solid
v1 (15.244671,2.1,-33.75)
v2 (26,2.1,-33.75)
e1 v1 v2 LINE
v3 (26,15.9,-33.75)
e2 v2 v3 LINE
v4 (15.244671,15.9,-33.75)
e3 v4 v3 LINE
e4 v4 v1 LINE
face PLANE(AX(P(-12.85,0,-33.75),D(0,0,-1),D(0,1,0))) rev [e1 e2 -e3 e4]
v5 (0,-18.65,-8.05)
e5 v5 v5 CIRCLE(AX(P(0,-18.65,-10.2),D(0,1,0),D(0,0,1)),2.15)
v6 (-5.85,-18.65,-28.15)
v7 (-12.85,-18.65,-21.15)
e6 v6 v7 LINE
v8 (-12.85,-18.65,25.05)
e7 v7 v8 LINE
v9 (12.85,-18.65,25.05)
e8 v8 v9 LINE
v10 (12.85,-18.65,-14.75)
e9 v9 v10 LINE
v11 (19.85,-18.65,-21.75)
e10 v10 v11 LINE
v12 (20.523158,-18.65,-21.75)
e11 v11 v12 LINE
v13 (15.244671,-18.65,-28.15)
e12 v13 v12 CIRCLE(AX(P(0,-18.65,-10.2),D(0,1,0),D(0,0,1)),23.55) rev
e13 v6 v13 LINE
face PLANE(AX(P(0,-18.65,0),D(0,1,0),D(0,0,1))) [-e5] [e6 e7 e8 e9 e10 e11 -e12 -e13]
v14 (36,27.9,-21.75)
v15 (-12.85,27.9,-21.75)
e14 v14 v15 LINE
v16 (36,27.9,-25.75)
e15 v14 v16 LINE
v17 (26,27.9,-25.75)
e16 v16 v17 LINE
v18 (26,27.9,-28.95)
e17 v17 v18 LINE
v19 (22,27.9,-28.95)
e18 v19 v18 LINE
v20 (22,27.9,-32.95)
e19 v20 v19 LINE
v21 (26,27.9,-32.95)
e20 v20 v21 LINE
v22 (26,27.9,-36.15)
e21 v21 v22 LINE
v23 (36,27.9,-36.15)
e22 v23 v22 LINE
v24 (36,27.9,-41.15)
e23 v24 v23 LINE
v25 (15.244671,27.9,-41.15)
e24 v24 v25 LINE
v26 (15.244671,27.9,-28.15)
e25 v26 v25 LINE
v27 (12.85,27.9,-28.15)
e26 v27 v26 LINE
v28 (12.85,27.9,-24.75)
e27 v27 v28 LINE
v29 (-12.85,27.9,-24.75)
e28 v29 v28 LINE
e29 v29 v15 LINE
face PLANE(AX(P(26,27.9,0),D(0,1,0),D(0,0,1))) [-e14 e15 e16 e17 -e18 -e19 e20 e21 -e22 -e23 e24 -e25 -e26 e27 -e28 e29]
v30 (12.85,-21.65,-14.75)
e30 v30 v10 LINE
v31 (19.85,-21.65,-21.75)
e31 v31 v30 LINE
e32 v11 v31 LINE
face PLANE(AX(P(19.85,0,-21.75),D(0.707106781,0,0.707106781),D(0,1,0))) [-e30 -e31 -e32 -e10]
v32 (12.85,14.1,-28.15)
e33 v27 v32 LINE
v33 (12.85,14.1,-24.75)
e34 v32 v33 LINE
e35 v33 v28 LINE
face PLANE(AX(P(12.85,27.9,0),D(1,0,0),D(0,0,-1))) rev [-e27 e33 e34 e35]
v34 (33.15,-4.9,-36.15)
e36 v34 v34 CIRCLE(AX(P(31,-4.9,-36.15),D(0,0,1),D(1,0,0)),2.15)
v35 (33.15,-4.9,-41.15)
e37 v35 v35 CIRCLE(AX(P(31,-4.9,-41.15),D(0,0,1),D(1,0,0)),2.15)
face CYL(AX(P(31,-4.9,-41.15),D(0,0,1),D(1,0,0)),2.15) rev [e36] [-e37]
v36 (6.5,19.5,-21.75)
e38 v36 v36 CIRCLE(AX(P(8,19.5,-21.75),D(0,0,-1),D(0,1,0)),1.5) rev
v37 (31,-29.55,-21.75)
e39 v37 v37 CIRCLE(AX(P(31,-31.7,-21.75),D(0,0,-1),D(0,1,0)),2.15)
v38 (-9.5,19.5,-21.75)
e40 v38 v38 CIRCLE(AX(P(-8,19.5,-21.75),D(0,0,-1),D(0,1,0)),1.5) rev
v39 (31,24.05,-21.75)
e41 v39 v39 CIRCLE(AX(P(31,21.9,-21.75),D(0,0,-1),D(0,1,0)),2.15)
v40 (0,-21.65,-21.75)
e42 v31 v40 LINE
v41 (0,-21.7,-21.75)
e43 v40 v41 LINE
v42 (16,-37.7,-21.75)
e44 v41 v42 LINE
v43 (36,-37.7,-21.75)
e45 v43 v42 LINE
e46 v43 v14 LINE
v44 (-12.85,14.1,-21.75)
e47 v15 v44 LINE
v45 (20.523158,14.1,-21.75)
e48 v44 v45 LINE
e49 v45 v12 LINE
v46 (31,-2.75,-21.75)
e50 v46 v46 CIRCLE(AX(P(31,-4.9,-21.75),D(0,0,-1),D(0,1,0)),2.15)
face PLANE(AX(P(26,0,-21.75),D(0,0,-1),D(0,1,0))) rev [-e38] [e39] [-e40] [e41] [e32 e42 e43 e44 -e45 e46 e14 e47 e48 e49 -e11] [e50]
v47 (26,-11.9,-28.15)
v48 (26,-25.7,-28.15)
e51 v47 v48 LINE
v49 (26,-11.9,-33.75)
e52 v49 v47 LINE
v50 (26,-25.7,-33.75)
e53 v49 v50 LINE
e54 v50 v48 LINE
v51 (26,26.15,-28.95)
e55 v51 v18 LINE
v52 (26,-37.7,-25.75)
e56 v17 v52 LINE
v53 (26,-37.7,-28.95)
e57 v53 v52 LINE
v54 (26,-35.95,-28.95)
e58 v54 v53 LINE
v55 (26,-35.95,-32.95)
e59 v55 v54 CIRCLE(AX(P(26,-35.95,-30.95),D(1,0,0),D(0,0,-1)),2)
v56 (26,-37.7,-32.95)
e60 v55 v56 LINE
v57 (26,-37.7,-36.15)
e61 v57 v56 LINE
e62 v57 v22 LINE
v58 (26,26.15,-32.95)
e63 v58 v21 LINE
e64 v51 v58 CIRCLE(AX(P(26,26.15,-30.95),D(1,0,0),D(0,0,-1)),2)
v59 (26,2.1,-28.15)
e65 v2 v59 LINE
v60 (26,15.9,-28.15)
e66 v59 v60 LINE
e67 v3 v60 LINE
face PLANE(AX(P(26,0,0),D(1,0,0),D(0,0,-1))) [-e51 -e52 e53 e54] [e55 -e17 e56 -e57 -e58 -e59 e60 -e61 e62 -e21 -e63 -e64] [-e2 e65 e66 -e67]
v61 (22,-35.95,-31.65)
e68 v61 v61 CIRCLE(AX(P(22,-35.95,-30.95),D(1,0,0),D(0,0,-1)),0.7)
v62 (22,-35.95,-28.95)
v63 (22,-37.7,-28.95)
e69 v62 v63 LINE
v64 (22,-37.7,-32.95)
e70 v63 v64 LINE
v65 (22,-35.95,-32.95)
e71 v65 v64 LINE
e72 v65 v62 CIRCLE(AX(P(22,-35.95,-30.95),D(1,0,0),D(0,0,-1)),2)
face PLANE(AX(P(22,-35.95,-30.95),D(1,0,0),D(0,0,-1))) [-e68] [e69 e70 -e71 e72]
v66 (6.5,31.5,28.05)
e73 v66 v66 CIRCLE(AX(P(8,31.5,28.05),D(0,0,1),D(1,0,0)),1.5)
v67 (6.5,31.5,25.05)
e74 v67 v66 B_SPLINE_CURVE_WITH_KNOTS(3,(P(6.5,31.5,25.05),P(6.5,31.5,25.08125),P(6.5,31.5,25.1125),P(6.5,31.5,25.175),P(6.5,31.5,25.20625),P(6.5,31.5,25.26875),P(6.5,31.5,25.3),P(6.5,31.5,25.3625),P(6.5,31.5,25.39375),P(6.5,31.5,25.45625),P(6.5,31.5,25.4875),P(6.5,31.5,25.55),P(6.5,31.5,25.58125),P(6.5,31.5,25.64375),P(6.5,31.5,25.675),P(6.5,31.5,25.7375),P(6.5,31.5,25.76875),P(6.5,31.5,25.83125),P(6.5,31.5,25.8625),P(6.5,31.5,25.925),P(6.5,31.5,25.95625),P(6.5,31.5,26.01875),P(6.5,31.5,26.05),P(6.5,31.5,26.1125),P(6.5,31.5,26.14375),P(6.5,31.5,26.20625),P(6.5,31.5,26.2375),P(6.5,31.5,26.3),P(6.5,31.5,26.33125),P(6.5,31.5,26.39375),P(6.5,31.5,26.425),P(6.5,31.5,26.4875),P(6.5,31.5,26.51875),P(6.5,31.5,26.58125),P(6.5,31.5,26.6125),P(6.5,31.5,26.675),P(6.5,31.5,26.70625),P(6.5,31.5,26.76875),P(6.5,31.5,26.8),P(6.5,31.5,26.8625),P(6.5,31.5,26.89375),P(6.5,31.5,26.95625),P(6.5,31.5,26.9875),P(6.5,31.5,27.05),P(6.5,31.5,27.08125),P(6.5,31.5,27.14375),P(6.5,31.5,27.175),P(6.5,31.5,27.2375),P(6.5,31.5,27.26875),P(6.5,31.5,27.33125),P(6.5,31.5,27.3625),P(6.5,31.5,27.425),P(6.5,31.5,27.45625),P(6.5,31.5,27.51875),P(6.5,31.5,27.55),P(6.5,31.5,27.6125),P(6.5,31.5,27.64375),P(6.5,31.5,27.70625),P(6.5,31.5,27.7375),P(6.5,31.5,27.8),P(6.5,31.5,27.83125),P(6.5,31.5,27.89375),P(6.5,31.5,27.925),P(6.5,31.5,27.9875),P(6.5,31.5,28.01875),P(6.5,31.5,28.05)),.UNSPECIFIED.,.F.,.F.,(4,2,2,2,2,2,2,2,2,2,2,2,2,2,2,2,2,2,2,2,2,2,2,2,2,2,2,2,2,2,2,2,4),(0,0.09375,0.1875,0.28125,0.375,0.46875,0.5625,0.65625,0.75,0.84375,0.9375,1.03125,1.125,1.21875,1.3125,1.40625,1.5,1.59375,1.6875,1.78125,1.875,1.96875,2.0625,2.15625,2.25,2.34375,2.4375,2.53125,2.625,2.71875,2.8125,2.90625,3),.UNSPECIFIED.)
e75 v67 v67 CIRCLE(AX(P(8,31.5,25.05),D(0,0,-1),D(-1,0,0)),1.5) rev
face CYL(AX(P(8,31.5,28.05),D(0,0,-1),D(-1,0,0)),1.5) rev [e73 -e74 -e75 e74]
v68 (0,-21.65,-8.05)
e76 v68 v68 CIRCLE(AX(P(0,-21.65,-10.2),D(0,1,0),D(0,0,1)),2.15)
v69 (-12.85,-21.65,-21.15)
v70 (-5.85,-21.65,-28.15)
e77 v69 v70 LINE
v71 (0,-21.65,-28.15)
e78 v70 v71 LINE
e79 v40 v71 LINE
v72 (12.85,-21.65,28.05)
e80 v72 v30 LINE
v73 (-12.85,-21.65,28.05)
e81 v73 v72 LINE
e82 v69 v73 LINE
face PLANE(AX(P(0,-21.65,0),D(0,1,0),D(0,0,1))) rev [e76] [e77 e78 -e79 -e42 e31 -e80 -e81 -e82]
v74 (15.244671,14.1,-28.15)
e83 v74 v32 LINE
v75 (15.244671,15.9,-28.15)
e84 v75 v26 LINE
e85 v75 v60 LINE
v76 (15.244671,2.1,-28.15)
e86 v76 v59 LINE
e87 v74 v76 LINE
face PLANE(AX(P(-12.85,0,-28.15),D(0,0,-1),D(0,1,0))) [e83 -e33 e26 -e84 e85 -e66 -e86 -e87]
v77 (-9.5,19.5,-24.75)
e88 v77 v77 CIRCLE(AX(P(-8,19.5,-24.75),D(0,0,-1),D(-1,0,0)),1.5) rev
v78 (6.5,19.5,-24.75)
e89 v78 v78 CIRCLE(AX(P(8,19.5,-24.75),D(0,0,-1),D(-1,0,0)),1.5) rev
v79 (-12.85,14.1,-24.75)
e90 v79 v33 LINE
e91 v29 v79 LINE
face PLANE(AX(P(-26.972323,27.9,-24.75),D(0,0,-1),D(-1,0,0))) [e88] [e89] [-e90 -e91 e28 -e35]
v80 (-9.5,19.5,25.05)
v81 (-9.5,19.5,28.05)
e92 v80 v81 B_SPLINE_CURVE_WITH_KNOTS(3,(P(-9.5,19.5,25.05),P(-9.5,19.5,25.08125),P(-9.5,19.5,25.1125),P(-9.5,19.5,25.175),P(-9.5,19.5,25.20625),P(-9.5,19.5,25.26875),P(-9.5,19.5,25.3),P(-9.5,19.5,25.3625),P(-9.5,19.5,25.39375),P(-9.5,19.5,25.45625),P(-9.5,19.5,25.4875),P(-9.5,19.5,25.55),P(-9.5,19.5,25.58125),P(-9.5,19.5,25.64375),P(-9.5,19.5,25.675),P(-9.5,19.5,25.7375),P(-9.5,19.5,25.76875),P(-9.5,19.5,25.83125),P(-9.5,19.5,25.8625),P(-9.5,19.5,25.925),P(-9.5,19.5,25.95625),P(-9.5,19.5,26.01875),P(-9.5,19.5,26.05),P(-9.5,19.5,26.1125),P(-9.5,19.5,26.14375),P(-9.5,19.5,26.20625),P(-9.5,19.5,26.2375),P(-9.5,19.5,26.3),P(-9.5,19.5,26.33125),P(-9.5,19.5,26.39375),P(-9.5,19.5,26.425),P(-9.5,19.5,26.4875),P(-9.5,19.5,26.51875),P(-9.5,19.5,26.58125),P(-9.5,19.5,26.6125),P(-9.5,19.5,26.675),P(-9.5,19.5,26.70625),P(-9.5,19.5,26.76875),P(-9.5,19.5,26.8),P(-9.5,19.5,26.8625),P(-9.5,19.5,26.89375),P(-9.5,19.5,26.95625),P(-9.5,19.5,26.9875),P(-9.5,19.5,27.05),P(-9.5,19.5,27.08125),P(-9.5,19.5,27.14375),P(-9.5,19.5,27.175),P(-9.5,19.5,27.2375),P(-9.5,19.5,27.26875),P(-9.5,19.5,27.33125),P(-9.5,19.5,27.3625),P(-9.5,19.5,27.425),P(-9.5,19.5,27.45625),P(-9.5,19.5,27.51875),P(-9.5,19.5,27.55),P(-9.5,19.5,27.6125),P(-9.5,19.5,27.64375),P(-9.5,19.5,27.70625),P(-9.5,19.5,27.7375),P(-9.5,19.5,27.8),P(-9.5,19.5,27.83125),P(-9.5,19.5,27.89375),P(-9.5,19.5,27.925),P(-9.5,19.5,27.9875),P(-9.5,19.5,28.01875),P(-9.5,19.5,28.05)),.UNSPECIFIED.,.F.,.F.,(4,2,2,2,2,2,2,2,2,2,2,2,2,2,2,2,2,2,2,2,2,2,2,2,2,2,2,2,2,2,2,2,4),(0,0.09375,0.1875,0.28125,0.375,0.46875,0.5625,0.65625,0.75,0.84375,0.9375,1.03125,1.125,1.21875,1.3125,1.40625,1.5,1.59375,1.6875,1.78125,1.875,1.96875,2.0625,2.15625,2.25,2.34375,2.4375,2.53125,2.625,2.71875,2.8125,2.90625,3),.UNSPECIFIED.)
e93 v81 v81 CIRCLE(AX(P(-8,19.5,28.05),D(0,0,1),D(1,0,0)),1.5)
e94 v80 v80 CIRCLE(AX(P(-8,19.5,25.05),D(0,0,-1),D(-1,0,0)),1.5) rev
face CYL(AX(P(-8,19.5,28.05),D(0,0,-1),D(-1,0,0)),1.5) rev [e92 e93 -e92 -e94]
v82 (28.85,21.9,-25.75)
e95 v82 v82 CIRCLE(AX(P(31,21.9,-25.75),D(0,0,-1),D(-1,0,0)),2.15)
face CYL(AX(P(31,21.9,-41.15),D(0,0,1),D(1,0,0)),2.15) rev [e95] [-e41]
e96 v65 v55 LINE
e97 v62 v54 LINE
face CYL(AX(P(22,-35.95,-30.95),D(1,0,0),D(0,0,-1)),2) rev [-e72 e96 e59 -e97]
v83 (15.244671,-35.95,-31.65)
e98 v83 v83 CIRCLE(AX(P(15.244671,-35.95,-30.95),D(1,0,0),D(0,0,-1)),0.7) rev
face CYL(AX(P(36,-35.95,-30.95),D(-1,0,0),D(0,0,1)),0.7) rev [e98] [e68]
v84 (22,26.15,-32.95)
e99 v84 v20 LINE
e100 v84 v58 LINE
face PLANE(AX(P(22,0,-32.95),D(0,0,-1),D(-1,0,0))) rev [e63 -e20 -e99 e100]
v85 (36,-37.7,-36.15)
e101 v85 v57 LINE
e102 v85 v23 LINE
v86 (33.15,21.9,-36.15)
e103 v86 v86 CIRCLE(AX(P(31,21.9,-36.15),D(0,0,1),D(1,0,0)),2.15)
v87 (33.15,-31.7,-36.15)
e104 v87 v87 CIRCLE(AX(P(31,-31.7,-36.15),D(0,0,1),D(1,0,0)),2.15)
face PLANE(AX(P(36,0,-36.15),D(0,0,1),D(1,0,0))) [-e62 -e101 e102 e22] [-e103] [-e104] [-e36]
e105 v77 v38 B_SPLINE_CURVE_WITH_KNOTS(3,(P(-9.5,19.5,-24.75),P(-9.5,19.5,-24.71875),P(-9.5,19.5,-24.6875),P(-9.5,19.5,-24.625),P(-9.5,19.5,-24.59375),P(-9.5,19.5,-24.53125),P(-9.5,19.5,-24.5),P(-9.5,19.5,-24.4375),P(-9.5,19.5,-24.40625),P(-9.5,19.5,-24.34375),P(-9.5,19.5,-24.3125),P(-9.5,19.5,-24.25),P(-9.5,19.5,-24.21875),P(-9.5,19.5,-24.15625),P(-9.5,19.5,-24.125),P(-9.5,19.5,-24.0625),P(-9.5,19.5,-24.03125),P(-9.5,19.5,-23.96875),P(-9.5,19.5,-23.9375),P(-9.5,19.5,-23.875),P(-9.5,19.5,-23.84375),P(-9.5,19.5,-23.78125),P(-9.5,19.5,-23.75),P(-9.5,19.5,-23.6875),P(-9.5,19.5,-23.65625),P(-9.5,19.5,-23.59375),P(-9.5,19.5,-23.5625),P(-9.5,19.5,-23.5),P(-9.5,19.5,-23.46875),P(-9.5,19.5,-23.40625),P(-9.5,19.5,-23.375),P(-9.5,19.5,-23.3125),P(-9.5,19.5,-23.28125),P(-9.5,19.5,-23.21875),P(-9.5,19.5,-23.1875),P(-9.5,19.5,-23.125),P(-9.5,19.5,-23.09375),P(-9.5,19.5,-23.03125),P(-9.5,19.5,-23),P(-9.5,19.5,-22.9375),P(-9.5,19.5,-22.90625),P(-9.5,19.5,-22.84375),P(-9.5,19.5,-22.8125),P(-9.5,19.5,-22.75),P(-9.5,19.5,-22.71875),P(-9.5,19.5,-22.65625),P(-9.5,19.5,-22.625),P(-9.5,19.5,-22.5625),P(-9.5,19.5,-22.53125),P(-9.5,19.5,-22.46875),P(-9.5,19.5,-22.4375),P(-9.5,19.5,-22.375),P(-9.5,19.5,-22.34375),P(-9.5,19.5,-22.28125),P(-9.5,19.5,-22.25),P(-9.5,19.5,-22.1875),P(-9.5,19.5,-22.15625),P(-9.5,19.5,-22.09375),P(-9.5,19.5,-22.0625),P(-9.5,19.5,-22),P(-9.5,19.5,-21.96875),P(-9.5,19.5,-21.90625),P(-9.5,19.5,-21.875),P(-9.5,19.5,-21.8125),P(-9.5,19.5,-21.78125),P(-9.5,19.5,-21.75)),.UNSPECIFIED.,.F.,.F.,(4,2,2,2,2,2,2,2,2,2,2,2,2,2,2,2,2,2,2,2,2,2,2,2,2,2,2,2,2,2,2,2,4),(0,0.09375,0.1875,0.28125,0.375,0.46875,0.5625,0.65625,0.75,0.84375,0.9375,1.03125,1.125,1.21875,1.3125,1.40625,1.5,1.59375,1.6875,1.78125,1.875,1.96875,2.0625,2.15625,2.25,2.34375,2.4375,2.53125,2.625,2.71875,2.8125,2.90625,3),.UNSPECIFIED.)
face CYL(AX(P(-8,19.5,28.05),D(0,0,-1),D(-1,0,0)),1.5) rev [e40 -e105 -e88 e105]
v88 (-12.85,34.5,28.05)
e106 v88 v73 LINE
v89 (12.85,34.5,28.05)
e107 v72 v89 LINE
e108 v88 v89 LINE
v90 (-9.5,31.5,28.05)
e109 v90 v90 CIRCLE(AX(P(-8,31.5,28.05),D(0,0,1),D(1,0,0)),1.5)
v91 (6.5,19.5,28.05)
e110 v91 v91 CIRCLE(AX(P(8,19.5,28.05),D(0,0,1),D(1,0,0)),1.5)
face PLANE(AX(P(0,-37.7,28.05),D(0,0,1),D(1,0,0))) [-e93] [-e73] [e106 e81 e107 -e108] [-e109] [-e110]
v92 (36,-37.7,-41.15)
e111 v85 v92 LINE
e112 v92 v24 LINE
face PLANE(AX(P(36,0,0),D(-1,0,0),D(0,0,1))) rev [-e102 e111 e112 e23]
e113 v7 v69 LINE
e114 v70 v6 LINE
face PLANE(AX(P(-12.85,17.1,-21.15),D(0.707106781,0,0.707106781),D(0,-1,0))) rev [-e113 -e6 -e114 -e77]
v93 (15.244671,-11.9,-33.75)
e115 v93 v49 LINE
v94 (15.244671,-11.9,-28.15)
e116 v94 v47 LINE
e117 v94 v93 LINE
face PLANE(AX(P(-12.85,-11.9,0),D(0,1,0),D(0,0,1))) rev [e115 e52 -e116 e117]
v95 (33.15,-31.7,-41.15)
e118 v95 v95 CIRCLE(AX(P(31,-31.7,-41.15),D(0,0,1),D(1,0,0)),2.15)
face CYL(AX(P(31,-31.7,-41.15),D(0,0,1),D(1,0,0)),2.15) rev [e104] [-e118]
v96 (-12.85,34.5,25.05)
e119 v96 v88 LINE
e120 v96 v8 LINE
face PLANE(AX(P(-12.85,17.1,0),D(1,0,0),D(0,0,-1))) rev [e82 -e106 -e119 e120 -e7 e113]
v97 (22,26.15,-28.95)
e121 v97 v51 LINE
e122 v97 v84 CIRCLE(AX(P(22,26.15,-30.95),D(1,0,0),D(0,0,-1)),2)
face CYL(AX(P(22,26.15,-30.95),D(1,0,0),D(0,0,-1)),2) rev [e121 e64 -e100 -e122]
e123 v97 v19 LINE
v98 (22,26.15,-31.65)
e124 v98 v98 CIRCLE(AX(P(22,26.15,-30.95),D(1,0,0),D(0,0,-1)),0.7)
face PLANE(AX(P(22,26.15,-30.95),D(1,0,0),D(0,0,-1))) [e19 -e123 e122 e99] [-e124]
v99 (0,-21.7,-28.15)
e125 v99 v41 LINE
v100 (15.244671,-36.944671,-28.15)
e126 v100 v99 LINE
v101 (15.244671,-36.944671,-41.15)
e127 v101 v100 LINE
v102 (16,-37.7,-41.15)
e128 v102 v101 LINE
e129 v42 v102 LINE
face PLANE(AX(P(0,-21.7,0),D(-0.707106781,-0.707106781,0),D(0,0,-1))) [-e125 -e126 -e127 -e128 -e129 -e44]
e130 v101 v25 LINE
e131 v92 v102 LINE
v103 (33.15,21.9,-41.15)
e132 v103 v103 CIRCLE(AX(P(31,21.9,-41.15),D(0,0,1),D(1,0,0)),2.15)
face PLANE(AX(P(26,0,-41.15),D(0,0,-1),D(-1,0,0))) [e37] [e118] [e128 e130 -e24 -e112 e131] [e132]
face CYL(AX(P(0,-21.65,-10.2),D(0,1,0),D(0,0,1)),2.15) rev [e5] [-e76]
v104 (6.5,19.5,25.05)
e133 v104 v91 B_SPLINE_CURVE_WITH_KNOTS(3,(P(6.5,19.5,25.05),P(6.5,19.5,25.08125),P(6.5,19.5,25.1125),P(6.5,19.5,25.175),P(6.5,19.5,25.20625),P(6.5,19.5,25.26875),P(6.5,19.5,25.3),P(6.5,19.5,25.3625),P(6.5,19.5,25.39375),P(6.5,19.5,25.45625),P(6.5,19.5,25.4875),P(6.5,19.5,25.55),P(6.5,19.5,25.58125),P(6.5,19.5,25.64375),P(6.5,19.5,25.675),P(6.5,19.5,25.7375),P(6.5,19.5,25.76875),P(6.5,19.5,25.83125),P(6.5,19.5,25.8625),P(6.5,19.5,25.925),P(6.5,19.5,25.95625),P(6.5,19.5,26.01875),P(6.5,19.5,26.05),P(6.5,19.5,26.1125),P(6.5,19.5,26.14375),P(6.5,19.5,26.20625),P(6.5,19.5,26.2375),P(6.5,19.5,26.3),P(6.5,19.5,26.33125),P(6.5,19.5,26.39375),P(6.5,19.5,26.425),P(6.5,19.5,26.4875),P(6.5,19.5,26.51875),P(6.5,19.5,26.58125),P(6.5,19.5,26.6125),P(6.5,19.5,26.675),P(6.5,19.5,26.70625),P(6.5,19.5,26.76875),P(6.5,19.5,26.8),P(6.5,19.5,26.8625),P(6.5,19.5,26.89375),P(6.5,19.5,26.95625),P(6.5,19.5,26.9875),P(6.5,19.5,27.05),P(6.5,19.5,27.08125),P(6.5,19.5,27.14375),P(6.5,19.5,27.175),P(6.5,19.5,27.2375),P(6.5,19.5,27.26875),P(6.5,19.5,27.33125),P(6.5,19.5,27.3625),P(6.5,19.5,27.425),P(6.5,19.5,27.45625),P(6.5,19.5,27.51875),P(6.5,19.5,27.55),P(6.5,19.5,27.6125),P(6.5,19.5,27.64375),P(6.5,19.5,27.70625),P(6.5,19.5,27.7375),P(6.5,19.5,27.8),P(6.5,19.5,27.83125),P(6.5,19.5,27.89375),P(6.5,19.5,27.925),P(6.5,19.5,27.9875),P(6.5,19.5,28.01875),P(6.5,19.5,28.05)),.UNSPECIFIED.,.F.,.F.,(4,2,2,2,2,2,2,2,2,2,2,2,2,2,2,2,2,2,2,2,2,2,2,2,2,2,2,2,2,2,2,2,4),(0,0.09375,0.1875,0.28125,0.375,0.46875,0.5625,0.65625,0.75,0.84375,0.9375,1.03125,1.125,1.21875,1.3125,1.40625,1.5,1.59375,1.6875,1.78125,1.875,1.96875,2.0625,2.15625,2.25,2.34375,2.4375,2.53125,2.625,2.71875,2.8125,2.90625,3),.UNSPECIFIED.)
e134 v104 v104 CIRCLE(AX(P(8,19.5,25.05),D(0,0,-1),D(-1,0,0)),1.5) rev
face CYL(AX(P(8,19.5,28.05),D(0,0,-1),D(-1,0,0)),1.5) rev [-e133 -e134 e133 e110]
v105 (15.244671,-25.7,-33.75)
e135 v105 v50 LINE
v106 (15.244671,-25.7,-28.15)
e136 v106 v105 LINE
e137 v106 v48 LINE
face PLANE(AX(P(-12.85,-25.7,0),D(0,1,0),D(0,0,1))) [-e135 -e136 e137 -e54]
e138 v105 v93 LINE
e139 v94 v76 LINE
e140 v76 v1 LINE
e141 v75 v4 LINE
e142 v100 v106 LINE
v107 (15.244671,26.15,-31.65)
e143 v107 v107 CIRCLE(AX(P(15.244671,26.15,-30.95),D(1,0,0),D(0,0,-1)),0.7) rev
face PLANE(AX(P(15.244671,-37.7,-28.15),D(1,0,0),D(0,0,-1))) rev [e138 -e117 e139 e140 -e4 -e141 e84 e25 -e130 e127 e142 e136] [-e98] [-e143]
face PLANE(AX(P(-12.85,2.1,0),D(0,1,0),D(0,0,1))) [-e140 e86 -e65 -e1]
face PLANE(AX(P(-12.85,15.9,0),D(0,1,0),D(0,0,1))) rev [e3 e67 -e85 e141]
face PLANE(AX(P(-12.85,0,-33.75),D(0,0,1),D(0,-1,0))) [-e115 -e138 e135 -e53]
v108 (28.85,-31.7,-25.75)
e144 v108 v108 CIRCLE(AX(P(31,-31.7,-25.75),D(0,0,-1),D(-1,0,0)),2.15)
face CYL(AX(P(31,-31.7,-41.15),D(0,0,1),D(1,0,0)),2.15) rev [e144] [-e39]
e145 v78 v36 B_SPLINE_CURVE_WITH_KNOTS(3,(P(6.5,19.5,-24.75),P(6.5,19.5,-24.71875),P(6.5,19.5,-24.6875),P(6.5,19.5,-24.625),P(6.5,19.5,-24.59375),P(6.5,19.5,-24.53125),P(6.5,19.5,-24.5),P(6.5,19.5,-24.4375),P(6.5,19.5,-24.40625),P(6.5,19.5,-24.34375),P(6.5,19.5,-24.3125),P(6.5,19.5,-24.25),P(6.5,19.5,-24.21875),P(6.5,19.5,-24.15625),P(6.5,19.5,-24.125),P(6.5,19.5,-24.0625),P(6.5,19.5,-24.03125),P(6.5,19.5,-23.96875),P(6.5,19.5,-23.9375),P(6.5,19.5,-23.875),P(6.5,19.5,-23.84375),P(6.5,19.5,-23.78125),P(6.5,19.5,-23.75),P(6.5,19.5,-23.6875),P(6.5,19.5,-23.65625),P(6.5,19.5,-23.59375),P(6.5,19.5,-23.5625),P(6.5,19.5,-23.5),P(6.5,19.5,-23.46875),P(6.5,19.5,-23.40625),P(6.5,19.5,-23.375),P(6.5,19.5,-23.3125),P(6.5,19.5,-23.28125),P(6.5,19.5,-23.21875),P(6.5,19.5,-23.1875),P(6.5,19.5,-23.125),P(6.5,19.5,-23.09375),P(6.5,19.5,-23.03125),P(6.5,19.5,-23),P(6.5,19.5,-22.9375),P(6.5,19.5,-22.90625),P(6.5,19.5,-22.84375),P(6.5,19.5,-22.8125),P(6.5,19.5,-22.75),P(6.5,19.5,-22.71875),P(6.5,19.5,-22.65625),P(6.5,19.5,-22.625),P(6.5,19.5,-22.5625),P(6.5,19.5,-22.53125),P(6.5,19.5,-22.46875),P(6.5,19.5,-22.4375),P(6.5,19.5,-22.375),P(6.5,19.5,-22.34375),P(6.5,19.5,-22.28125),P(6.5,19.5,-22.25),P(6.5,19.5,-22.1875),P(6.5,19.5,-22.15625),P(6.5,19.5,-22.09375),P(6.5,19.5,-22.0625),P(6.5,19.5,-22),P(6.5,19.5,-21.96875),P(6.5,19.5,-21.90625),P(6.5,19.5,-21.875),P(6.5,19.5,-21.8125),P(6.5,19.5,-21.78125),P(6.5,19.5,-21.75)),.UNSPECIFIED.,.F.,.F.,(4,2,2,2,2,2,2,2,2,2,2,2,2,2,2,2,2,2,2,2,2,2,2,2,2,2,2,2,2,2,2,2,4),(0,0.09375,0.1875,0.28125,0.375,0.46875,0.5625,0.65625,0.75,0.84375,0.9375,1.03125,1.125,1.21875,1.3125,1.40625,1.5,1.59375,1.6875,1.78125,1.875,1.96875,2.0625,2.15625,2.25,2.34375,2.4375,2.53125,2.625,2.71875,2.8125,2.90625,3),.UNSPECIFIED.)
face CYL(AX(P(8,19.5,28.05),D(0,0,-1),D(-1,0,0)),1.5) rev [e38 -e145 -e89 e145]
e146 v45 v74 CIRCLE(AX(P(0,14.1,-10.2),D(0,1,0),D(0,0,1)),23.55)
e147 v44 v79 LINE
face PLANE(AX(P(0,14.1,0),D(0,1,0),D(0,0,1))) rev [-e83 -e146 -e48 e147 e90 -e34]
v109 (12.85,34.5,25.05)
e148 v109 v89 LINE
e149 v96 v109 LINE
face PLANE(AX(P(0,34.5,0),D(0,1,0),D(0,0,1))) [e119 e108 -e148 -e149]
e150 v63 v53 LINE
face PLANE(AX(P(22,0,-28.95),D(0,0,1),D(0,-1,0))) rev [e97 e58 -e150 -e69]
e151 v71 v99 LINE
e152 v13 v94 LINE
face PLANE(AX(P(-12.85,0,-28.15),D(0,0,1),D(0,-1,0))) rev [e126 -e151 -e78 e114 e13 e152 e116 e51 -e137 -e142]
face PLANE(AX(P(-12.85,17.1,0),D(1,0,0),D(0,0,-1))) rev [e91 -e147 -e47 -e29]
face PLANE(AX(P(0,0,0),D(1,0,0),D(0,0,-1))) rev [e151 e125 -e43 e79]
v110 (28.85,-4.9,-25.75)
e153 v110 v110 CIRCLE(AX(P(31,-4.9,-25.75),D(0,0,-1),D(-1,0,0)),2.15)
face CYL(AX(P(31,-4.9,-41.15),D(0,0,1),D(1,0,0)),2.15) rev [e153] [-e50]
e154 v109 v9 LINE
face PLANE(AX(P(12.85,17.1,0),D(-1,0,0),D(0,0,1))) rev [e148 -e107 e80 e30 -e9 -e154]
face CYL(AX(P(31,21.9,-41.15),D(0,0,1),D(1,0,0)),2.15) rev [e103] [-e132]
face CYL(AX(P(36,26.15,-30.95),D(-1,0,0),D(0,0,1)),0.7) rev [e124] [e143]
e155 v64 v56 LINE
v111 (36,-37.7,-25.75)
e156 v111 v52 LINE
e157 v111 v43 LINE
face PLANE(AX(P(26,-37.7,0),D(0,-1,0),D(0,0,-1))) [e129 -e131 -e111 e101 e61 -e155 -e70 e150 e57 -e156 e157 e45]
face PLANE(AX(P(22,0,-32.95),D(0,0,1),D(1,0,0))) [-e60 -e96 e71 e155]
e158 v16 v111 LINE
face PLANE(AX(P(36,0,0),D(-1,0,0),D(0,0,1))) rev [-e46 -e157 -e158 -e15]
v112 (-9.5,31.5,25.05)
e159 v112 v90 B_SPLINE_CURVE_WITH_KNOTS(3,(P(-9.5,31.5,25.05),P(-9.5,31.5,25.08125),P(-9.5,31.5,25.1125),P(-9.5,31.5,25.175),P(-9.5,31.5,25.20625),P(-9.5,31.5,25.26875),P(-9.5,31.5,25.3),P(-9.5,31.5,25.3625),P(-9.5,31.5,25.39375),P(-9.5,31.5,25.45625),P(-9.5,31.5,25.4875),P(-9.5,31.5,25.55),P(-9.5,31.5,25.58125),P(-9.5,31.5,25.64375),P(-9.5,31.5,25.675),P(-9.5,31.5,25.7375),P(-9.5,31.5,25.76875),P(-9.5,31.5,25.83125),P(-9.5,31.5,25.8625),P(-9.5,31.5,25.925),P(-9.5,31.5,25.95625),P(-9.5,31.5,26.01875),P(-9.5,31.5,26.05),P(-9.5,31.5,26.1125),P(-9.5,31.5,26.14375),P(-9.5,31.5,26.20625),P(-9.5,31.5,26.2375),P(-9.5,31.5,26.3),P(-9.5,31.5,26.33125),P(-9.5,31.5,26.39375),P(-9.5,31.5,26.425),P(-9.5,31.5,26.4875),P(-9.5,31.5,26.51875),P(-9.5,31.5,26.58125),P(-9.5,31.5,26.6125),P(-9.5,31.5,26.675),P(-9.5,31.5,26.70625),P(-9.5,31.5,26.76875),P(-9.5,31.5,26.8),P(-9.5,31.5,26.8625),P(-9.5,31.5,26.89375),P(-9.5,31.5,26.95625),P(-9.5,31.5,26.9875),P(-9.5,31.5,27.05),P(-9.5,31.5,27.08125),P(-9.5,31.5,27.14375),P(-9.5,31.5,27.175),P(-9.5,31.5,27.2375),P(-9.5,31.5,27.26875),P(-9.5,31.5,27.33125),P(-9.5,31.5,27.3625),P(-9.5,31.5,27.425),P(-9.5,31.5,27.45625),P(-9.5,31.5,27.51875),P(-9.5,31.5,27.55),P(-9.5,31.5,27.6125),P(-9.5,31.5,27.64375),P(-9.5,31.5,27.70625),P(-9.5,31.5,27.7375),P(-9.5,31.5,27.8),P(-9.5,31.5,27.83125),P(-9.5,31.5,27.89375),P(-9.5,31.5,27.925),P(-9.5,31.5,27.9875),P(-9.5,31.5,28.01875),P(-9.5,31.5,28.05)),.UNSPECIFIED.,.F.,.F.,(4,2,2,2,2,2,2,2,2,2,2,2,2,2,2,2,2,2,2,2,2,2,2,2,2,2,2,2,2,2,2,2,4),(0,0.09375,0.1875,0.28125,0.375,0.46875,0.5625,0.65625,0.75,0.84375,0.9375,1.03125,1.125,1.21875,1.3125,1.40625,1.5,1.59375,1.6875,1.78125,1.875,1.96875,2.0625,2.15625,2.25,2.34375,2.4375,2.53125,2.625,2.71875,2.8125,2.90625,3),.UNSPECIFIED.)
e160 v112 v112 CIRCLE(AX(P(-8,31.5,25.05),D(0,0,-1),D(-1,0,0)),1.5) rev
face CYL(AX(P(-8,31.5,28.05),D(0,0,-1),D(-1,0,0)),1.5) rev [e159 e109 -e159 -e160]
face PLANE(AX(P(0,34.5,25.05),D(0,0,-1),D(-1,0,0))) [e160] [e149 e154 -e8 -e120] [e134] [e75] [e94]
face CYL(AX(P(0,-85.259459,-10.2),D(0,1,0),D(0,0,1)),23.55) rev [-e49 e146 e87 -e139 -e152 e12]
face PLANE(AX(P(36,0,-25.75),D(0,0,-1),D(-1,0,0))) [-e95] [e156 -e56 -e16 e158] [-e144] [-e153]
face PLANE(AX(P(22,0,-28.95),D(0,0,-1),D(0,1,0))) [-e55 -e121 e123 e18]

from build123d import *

# Parameters (mm, degrees)
SKETCH1_W                       = 14
SKETCH1_H                       = 4
BOSS_EXTRUDE1_DEPTH             = 10.2
SKETCH1_7_W                     = 14
SKETCH1_7_H                     = 4
BOSS_EXTRUDE2_DEPTH             = 3
BOSS_EXTRUDE3_START             = 10.2
SKETCH1_8_W                     = 14
SKETCH1_8_H                     = 4
BOSS_EXTRUDE3_DEPTH             = 3
BOSS_EXTRUDE6_START             = 13.2
SKETCH1_11_W                    = 14
SKETCH1_11_H                    = 4
BOSS_EXTRUDE6_DEPTH             = 3
BOSS_EXTRUDE4_START             = 14.1
SKETCH1_9_W                     = 14
SKETCH1_9_H                     = 4
SKETCH1_9_R                     = 2.15
SKETCH1_9_W_2                   = 19.7
SKETCH1_9_H_2                   = 40.2
BOSS_EXTRUDE4_DEPTH             = 3
BOSS_EXTRUDE7_START             = -18.65
SKETCH2_R                       = 2.15
BOSS_EXTRUDE7_DEPTH             = 3
SKETCH2_3_W                     = 14
SKETCH2_3_H                     = 4
BOSS_EXTRUDE9_DEPTH             = 21.65
BOSS_EXTRUDE8_REACH             = 52.867
SKETCH1_12_W                    = 25.7
SKETCH1_12_H                    = 3
BOSS_EXTRUDE8_DIRECTION_2_REACH = 52.867
BOSS_EXTRUDE10_OUTLINE_W        = 19.4
BOSS_EXTRUDE10_OUTLINE_H        = 65.6
BOSS_EXTRUDE10_DEPTH            = 26
CUT_EXTRUDE2_DEPTH              = 64.646916657
CUT_EXTRUDE2_DEPTH_BACK         = 64.646916657
SKETCH4_3_W                     = 5.6
SKETCH4_3_H                     = 13.8
CUT_EXTRUDE3_START              = -18.65
SKETCH6_R                       = 23.55
CUT_EXTRUDE3_DEPTH              = 32.75
BOSS_EXTRUDE11_START            = 26
SKETCH4_4_W                     = 5
SKETCH4_4_H                     = 12
SKETCH4_4_W_2                   = 4
SKETCH4_4_H_2                   = 14
SKETCH4_4_H_3                   = 6.75
SKETCH4_4_H_4                   = 7.05
SKETCH4_4_H_5                   = 13.8
SKETCH4_4_H_6                   = 1.8
BOSS_EXTRUDE11_DEPTH            = 10
CUT_EXTRUDE4_DEPTH              = 69.344202388
CUT_EXTRUDE4_DEPTH_BACK         = 69.344202388
SKETCH7_W                       = 15.846906961
SKETCH7_H                       = 18.461570713
SKETCH7_W_2                     = 11.728499311
SKETCH7_H_2                     = 5.461570713
CUT_EXTRUDE5_START              = 17.1
SKETCH1_14_R                    = 2.15
SKETCH1_14_W                    = 19.7
SKETCH1_14_H                    = 40.2
CUT_EXTRUDE5_DEPTH              = 10.8
CUT_EXTRUDE1_START              = 17.1
SKETCH3_W                       = 2
SKETCH3_H                       = 7
CUT_EXTRUDE1_DEPTH              = 1
CUT_EXTRUDE6_START              = 14.1
CUT_EXTRUDE6_OUTLINE_R          = 2.15
CUT_EXTRUDE6_DEPTH              = 3
CUT_EXTRUDE7_DEPTH              = 67.412442358
CUT_EXTRUDE7_DEPTH_BACK         = 67.412442358
SKETCH8_R                       = 2.15
CHAMFER1_SIZE                   = 7
CHAMFER2_SIZE                   = 7
CUT_EXTRUDE8_DEPTH              = 67.412442358
CUT_EXTRUDE8_DEPTH_BACK         = 67.412442358
SKETCH9_W                       = 15.2446712
SKETCH9_H                       = 13
CHAMFER4_SIZE                   = 16
SKETCH10_R                      = 0.7
CUT_EXTRUDE10_DEPTH             = 67.412442358
CUT_EXTRUDE11_START             = 22
SKETCH10_3_R                    = 0.7
CUT_EXTRUDE11_DEPTH             = 4
CUT_EXTRUDE12_START             = 17.1
CUT_EXTRUDE12_DEPTH             = 35.75
SKETCH14_W                      = 28.5
SKETCH14_H                      = 6.888877351
CUT_EXTRUDE13_DEPTH             = 67.412442358
BOSS_EXTRUDE13_START            = -18.65
SKETCH14_3_W                    = 25.7
SKETCH14_3_H                    = 3
BOSS_EXTRUDE13_DEPTH            = 53.15
BOSS_EXTRUDE14_START            = 12.85
SKETCH16_W                      = 3
SKETCH16_H                      = 13.8
BOSS_EXTRUDE14_DEPTH            = 25.7
CUT_EXTRUDE14_DEPTH             = 67.412442358
CUT_EXTRUDE14_DEPTH_BACK        = 67.412442358
SKETCH15_R                      = 1.5


# Read off the part's stored shape, not the designer's step: Boss-Extrude10, Cut-Extrude6
with BuildPart() as part:
    # Sketch1 → Boss-Extrude1 (new body)
    with BuildSketch(Plane(origin=(0, 0, 0), x_dir=(1, 0, 0), z_dir=(0, 1, 0))):
        with Locations((0, 42.2)):
            Rectangle(SKETCH1_W, SKETCH1_H)
    extrude(amount=BOSS_EXTRUDE1_DEPTH)

    # Sketch1<7> → Boss-Extrude2 (add)
    with BuildSketch(Plane(origin=(0, 0, 0), x_dir=(1, 0, 0), z_dir=(0, 1, 0))):
        with Locations((0, 42.2)):
            Rectangle(SKETCH1_7_W, SKETCH1_7_H)
    extrude(amount=-BOSS_EXTRUDE2_DEPTH)

    # Sketch1<8> → Boss-Extrude3 (add)
    with BuildSketch(Plane(origin=(0, 0, 0), x_dir=(1, 0, 0), z_dir=(0, 1, 0)).offset(BOSS_EXTRUDE3_START)):
        with Locations((0, 42.2)):
            Rectangle(SKETCH1_8_W, SKETCH1_8_H)
    extrude(amount=BOSS_EXTRUDE3_DEPTH)

    # Sketch1<11> → Boss-Extrude6 (add)
    with BuildSketch(Plane(origin=(0, 0, 0), x_dir=(1, 0, 0), z_dir=(0, 1, 0)).offset(BOSS_EXTRUDE6_START)):
        with Locations((0, 42.2)):
            Rectangle(SKETCH1_11_W, SKETCH1_11_H)
    extrude(amount=BOSS_EXTRUDE6_DEPTH)

    # Sketch1<9> → Boss-Extrude4 (add)
    # profile 1 of 3: a face of its own
    with BuildSketch(Plane(origin=(0, 0, 0), x_dir=(1, 0, 0), z_dir=(0, 1, 0)).offset(BOSS_EXTRUDE4_START)):
        with Locations((0, 42.2)):
            Rectangle(SKETCH1_9_W, SKETCH1_9_H)
    # profile 2 of 3: a face of its own
    with BuildSketch(Plane(origin=(0, 0, 0), x_dir=(1, 0, 0), z_dir=(0, 1, 0)).offset(BOSS_EXTRUDE4_START)):
        Polygon((12.85, -29.1), (12.85, 28.2), (7, 40.2), (-7, 40.2), (-12.85, 28.2), (-12.85, -29.1), align=None)
        with Locations(Location((5, -24.1, 0), (0, 0, 270))):
            Circle(SKETCH1_9_R, mode=Mode.SUBTRACT)
        with Locations(Location((-5, -24.1, 0), (0, 0, 270))):
            Circle(SKETCH1_9_R, mode=Mode.SUBTRACT)
        with Locations(Location((5, 24.1, 0), (0, 0, 270))):
            Circle(SKETCH1_9_R, mode=Mode.SUBTRACT)
        with Locations(Location((-5, 24.1, 0), (0, 0, 270))):
            Circle(SKETCH1_9_R, mode=Mode.SUBTRACT)
        Rectangle(SKETCH1_9_W_2, SKETCH1_9_H_2, mode=Mode.SUBTRACT)
    # profile 3 of 3: a face of its own
    with BuildSketch(Plane(origin=(0, 0, 0), x_dir=(1, 0, 0), z_dir=(0, 1, 0)).offset(BOSS_EXTRUDE4_START)):
        Polygon((7, 40.2), (-7, 40.2), (-12.41125, 29.1), (12.41125, 29.1), align=None)
    extrude(amount=BOSS_EXTRUDE4_DEPTH)



with BuildPart() as body_2:
    # Sketch2 → Boss-Extrude7 (new body)
    with BuildSketch(Plane(origin=(0, 0, 0), x_dir=(1, 0, 0), z_dir=(0, 1, 0)).offset(BOSS_EXTRUDE7_START)):
        Polygon((7, 44.2), (-7, 44.2), (-7, 40.2), (-12.85, 28.2), (-12.85, -29.1), (12.85, -29.1), (12.85, 28.2), (7, 40.2), align=None)
        with Locations(Location((0, 10.2, 0), (0, 0, 270))):
            Circle(SKETCH2_R, mode=Mode.SUBTRACT)
    extrude(amount=-BOSS_EXTRUDE7_DEPTH)


with BuildPart() as part_1:
    add(part.part)

    add(body_2.part)  # Boss-Extrude9 merges body 2
    # Sketch2<3> → Boss-Extrude9 (add)
    with BuildSketch(Plane(origin=(0, 0, 0), x_dir=(1, 0, 0), z_dir=(0, 1, 0))):
        with Locations((0, 42.2)):
            Rectangle(SKETCH2_3_W, SKETCH2_3_H)
    extrude(amount=-BOSS_EXTRUDE9_DEPTH)

    # Boss-Extrude8: up to this face of the body (flat: up to its plane)
    boss_extrude8_end = Plane(part_1.part.faces().sort_by_distance((6.22325165, 17.1, -42.2))[0])
    # Sketch1<12> → Boss-Extrude8 (add, up to the picked face)
    with BuildSketch(Plane(origin=(0, 0, 0), x_dir=(1, 0, 0), z_dir=(0, 1, 0)), mode=Mode.PRIVATE) as boss_extrude8_sk1:
        with Locations((0, -30.6)):
            Rectangle(SKETCH1_12_W, SKETCH1_12_H)
    boss_extrude8_tool1 = split(extrude(boss_extrude8_sk1.sketch, amount=BOSS_EXTRUDE8_REACH, mode=Mode.PRIVATE), bisect_by=boss_extrude8_end, keep=Keep.BOTH, mode=Mode.PRIVATE)
    add(boss_extrude8_tool1.solids().sort_by(Axis((0, 0, 30.6), (0, 1, 0)))[0])

    # Boss-Extrude8 direction 2: up to this face of the body (flat: up to its plane)
    boss_extrude8_direction_2_end = Plane(part_1.part.faces().sort_by_distance((0, -21.65, -5.454834504))[0])
    # Sketch1<12> → Boss-Extrude8 direction 2 (add, up to the picked face)
    with BuildSketch(Plane(origin=(0, 0, 0), x_dir=(1, 0, 0), z_dir=(0, 1, 0)), mode=Mode.PRIVATE) as boss_extrude8_direction_2_sk1:
        with Locations((0, -30.6)):
            Rectangle(SKETCH1_12_W, SKETCH1_12_H)
    boss_extrude8_direction_2_tool1 = split(extrude(boss_extrude8_direction_2_sk1.sketch, amount=-BOSS_EXTRUDE8_DIRECTION_2_REACH, mode=Mode.PRIVATE), bisect_by=boss_extrude8_direction_2_end, keep=Keep.BOTH, mode=Mode.PRIVATE)
    add(boss_extrude8_direction_2_tool1.solids().sort_by(Axis((0, 0, 30.6), (0, -1, 0)))[0])

    # Boss-Extrude10 outline → Boss-Extrude10 (add)
    with BuildSketch(Plane(origin=(0, 0, 0), x_dir=(0, 0, -1), z_dir=(1, 0, 0))):
        with Locations((31.45, -4.9)):
            Rectangle(BOSS_EXTRUDE10_OUTLINE_W, BOSS_EXTRUDE10_OUTLINE_H)
    extrude(amount=BOSS_EXTRUDE10_DEPTH)

    # Sketch4<3> → Cut-Extrude2 (cut, two sides: drawn at the far end of the back side and taken through both)
    with BuildSketch(Plane(origin=(0, 0, 0), x_dir=(0, 0, -1), z_dir=(1, 0, 0)).offset(-CUT_EXTRUDE2_DEPTH_BACK)):
        with Locations((30.95, -18.8)):
            Rectangle(SKETCH4_3_W, SKETCH4_3_H)
        with Locations((30.95, 9)):
            Rectangle(SKETCH4_3_W, SKETCH4_3_H)
    extrude(amount=CUT_EXTRUDE2_DEPTH + CUT_EXTRUDE2_DEPTH_BACK, mode=Mode.SUBTRACT)

    # Sketch6 → Cut-Extrude3 (cut)
    with BuildSketch(Plane(origin=(0, 0, 0), x_dir=(1, 0, 0), z_dir=(0, 1, 0)).offset(CUT_EXTRUDE3_START)):
        with Locations((0, 10.2)):
            Circle(SKETCH6_R)
    extrude(amount=CUT_EXTRUDE3_DEPTH, mode=Mode.SUBTRACT)

    # Sketch4<4> → Boss-Extrude11 (add)
    with BuildSketch(Plane(origin=(0, 0, 0), x_dir=(0, 0, -1), z_dir=(1, 0, 0)).offset(BOSS_EXTRUDE11_START)):
        with Locations((38.65, 21.9)):
            Rectangle(SKETCH4_4_W, SKETCH4_4_H)
        with Locations((23.75, 21.9)):
            Rectangle(SKETCH4_4_W_2, SKETCH4_4_H)
        with Locations((23.75, -31.7)):
            Rectangle(SKETCH4_4_W_2, SKETCH4_4_H)
        with Locations((38.65, -31.7)):
            Rectangle(SKETCH4_4_W, SKETCH4_4_H)
        with Locations((38.65, -4.9)):
            Rectangle(SKETCH4_4_W, SKETCH4_4_H_2)
        with Locations((23.75, -4.9)):
            Rectangle(SKETCH4_4_W_2, SKETCH4_4_H_2)
        with Locations((23.75, 8.1)):
            Rectangle(SKETCH4_4_W_2, SKETCH4_4_H)
        with Locations((23.75, -15.275)):
            Rectangle(SKETCH4_4_W_2, SKETCH4_4_H_3)
        with Locations((23.75, -22.175)):
            Rectangle(SKETCH4_4_W_2, SKETCH4_4_H_4)
        with Locations((38.65, -18.8)):
            Rectangle(SKETCH4_4_W, SKETCH4_4_H_5)
        with Locations((38.65, 9)):
            Rectangle(SKETCH4_4_W, SKETCH4_4_H_5)
        with Locations((23.75, 15)):
            Rectangle(SKETCH4_4_W_2, SKETCH4_4_H_6)
    extrude(amount=BOSS_EXTRUDE11_DEPTH)

    # Sketch7 → Cut-Extrude4 (cut, two sides: drawn at the far end of the back side and taken through both)
    with BuildSketch(Plane(origin=(0, 0, 0), x_dir=(1, 0, 0), z_dir=(0, 1, 0)).offset(-CUT_EXTRUDE4_DEPTH_BACK)):
        with Locations((-7.923453481, 37.380785357)):
            Rectangle(SKETCH7_W, SKETCH7_H)
        with Locations((5.864249656, 43.880785357)):
            Rectangle(SKETCH7_W_2, SKETCH7_H_2)
    extrude(amount=CUT_EXTRUDE4_DEPTH + CUT_EXTRUDE4_DEPTH_BACK, mode=Mode.SUBTRACT)

    # Sketch1<14> → Cut-Extrude5 (cut)
    # profile 1 of 5: a face of its own
    with BuildSketch(Plane(origin=(0, 0, 0), x_dir=(1, 0, 0), z_dir=(0, 1, 0)).offset(CUT_EXTRUDE5_START)):
        Polygon((12.41125, 29.1), (-12.41125, 29.1), (-12.85, 28.2), (-12.85, -29.1), (12.85, -29.1), (12.85, 28.2), align=None)
        with Locations(Location((-5, -24.1, 0), (0, 0, 270))):
            Circle(SKETCH1_14_R, mode=Mode.SUBTRACT)
        with Locations(Location((5, -24.1, 0), (0, 0, 270))):
            Circle(SKETCH1_14_R, mode=Mode.SUBTRACT)
        Rectangle(SKETCH1_14_W, SKETCH1_14_H, mode=Mode.SUBTRACT)
        with Locations(Location((-5, 24.1, 0), (0, 0, 270))):
            Circle(SKETCH1_14_R, mode=Mode.SUBTRACT)
        with Locations((5, 24.1)):
            Circle(SKETCH1_14_R, mode=Mode.SUBTRACT)
    # profile 2 of 5: a face of its own
    with BuildSketch(Plane(origin=(0, 0, 0), x_dir=(1, 0, 0), z_dir=(0, 1, 0)).offset(CUT_EXTRUDE5_START)):
        with Locations((5, 24.1)):
            Circle(SKETCH1_14_R)
    # profile 3 of 5: a face of its own
    with BuildSketch(Plane(origin=(0, 0, 0), x_dir=(1, 0, 0), z_dir=(0, 1, 0)).offset(CUT_EXTRUDE5_START)):
        with Locations(Location((-5, 24.1, 0), (0, 0, 270))):
            Circle(SKETCH1_14_R)
    # profile 4 of 5: a face of its own
    with BuildSketch(Plane(origin=(0, 0, 0), x_dir=(1, 0, 0), z_dir=(0, 1, 0)).offset(CUT_EXTRUDE5_START)):
        with Locations(Location((-5, -24.1, 0), (0, 0, 270))):
            Circle(SKETCH1_14_R)
    # profile 5 of 5: a face of its own
    with BuildSketch(Plane(origin=(0, 0, 0), x_dir=(1, 0, 0), z_dir=(0, 1, 0)).offset(CUT_EXTRUDE5_START)):
        with Locations(Location((5, -24.1, 0), (0, 0, 270))):
            Circle(SKETCH1_14_R)
    extrude(amount=CUT_EXTRUDE5_DEPTH, mode=Mode.SUBTRACT)

    # Sketch3 → Cut-Extrude1 (cut)
    with BuildSketch(Plane(origin=(0, 0, 0), x_dir=(1, 0, 0), z_dir=(0, 1, 0)).offset(CUT_EXTRUDE1_START)):
        with Locations((0, -23.6)):
            Rectangle(SKETCH3_W, SKETCH3_H)
    cut_extrude1 = extrude(amount=-CUT_EXTRUDE1_DEPTH, mode=Mode.SUBTRACT)

    # Mirror2: Cut-Extrude1 across plane
    add(cut_extrude1.mirror(Plane.XY), mode=Mode.SUBTRACT)

    # Cut-Extrude6 outline → Cut-Extrude6 (cut)
    with BuildSketch(Plane(origin=(0, 0, 0), x_dir=(1, 0, 0), z_dir=(0, 1, 0)).offset(CUT_EXTRUDE6_START)):
        with Locations((5, 24.1)):
            Circle(CUT_EXTRUDE6_OUTLINE_R)
    extrude(amount=CUT_EXTRUDE6_DEPTH, mode=Mode.SUBTRACT)

    # Sketch8 → Cut-Extrude7 (cut, two sides: drawn at the far end of the back side and taken through both)
    with BuildSketch(Plane.XY.offset(-CUT_EXTRUDE7_DEPTH_BACK)):
        with Locations(Location((31, 21.9, 0), (0, 0, 90))):
            Circle(SKETCH8_R)
        with Locations(Location((31, -4.9, 0), (0, 0, 90))):
            Circle(SKETCH8_R)
        with Locations(Location((31, -31.7, 0), (0, 0, 90))):
            Circle(SKETCH8_R)
    extrude(amount=CUT_EXTRUDE7_DEPTH + CUT_EXTRUDE7_DEPTH_BACK, mode=Mode.SUBTRACT)

    # Chamfer1
    chamfer1_edges = [part_1.edges().sort_by_distance(p)[0] for p in [
        (12.85, 15.6, -21.75),
        (12.85, -20.15, -21.75),
    ]]
    chamfer(chamfer1_edges, length=CHAMFER1_SIZE)

    # Chamfer2
    chamfer2_edges = [part_1.edges().sort_by_distance(p)[0] for p in [
        (0, -4.9, -41.15),
        (-12.85, -20.15, -28.15),
        (-12.85, 15.6, -28.15),
    ]]
    chamfer(chamfer2_edges, length=CHAMFER2_SIZE)

    # Sketch9 → Cut-Extrude8 (cut, two sides: drawn at the far end of the back side and taken through both)
    with BuildSketch(Plane(origin=(0, 0, 0), x_dir=(1, 0, 0), z_dir=(0, 1, 0)).offset(-CUT_EXTRUDE8_DEPTH_BACK)):
        with Locations((7.6223356, 34.65)):
            Rectangle(SKETCH9_W, SKETCH9_H)
    extrude(amount=CUT_EXTRUDE8_DEPTH + CUT_EXTRUDE8_DEPTH_BACK, mode=Mode.SUBTRACT)

    # Chamfer4
    chamfer4_edges = [part_1.edges().sort_by_distance(p)[0] for p in [
        (0, -37.7, -24.95),
    ]]
    chamfer(chamfer4_edges, length=CHAMFER4_SIZE)

    # Sketch10 → Cut-Extrude10 (cut, through all)
    with BuildSketch(Plane(origin=(0, 0, 0), x_dir=(0, 0, -1), z_dir=(1, 0, 0))):
        with Locations((30.95, 26.15)):
            Circle(SKETCH10_R)
        with Locations((30.95, -35.95)):
            Circle(SKETCH10_R)
    extrude(amount=CUT_EXTRUDE10_DEPTH, mode=Mode.SUBTRACT)

    # Sketch10<3> → Cut-Extrude11 (cut)
    # profile 1 of 2: a face of its own
    with BuildSketch(Plane(origin=(0, 0, 0), x_dir=(0, 0, -1), z_dir=(1, 0, 0)).offset(CUT_EXTRUDE11_START)):
        with BuildLine():
            Line((32.95, 27.9), (28.95, 27.9))
            Line((28.95, 27.9), (28.95, 26.15))
            ThreePointArc((28.95, 26.15), (30.95, 24.15), (32.95, 26.15))
            Line((32.95, 26.15), (32.95, 27.9))
        make_face()
        with Locations((30.95, 26.15)):
            Circle(SKETCH10_3_R, mode=Mode.SUBTRACT)
    # profile 2 of 2: a face of its own
    with BuildSketch(Plane(origin=(0, 0, 0), x_dir=(0, 0, -1), z_dir=(1, 0, 0)).offset(CUT_EXTRUDE11_START)):
        with BuildLine():
            Line((28.95, -37.7), (32.95, -37.7))
            Line((32.95, -37.7), (32.95, -35.95))
            ThreePointArc((32.95, -35.95), (30.95, -33.95), (28.95, -35.95))
            Line((28.95, -35.95), (28.95, -37.7))
        make_face()
        with Locations((30.95, -35.95)):
            Circle(SKETCH10_3_R, mode=Mode.SUBTRACT)
    extrude(amount=CUT_EXTRUDE11_DEPTH, mode=Mode.SUBTRACT)

    # Sketch12 → Cut-Extrude12 (cut)
    with BuildSketch(Plane(origin=(0, 0, 0), x_dir=(1, 0, 0), z_dir=(0, 1, 0)).offset(CUT_EXTRUDE12_START)):
        Polygon((12.85, 14.75), (19.85, 21.75), (12.85, 21.75), (12.85, 28.15), (-5.85, 28.15), (-12.85, 21.15), (-12.85, -32.1), (12.85, -32.1), align=None)
    extrude(amount=-CUT_EXTRUDE12_DEPTH, mode=Mode.SUBTRACT)

    # Sketch14 → Cut-Extrude13 (cut, through all)
    with BuildSketch(Plane(origin=(0, 0, 0), x_dir=(1, 0, 0), z_dir=(0, 1, 0))):
        with Locations((0, -31.494438675)):
            Rectangle(SKETCH14_W, SKETCH14_H)
    extrude(amount=-CUT_EXTRUDE13_DEPTH, mode=Mode.SUBTRACT)

    # Sketch14<3> → Boss-Extrude13 (add)
    with BuildSketch(Plane(origin=(0, 0, 0), x_dir=(1, 0, 0), z_dir=(0, 1, 0)).offset(BOSS_EXTRUDE13_START)):
        with Locations((0, -26.55)):
            Rectangle(SKETCH14_3_W, SKETCH14_3_H)
    extrude(amount=BOSS_EXTRUDE13_DEPTH)

    # Sketch16 → Boss-Extrude14 (add)
    with BuildSketch(Plane(origin=(0, 0, 0), x_dir=(0, 0, -1), z_dir=(1, 0, 0)).offset(BOSS_EXTRUDE14_START)):
        with Locations((23.25, 21)):
            Rectangle(SKETCH16_W, SKETCH16_H)
    extrude(amount=-BOSS_EXTRUDE14_DEPTH)

    # Sketch15 → Cut-Extrude14 (cut, two sides: drawn at the far end of the back side and taken through both)
    with BuildSketch(Plane.XY.offset(-CUT_EXTRUDE14_DEPTH_BACK)):
        with Locations(Location((-8, 31.5, 0), (0, 0, 180))):
            Circle(SKETCH15_R)
        with Locations(Location((8, 31.5, 0), (0, 0, 180))):
            Circle(SKETCH15_R)
        with Locations(Location((8, 19.5, 0), (0, 0, 180))):
            Circle(SKETCH15_R)
        with Locations(Location((-8, 19.5, 0), (0, 0, 180))):
            Circle(SKETCH15_R)
    extrude(amount=CUT_EXTRUDE14_DEPTH + CUT_EXTRUDE14_DEPTH_BACK, mode=Mode.SUBTRACT)


solid = part_1.part
